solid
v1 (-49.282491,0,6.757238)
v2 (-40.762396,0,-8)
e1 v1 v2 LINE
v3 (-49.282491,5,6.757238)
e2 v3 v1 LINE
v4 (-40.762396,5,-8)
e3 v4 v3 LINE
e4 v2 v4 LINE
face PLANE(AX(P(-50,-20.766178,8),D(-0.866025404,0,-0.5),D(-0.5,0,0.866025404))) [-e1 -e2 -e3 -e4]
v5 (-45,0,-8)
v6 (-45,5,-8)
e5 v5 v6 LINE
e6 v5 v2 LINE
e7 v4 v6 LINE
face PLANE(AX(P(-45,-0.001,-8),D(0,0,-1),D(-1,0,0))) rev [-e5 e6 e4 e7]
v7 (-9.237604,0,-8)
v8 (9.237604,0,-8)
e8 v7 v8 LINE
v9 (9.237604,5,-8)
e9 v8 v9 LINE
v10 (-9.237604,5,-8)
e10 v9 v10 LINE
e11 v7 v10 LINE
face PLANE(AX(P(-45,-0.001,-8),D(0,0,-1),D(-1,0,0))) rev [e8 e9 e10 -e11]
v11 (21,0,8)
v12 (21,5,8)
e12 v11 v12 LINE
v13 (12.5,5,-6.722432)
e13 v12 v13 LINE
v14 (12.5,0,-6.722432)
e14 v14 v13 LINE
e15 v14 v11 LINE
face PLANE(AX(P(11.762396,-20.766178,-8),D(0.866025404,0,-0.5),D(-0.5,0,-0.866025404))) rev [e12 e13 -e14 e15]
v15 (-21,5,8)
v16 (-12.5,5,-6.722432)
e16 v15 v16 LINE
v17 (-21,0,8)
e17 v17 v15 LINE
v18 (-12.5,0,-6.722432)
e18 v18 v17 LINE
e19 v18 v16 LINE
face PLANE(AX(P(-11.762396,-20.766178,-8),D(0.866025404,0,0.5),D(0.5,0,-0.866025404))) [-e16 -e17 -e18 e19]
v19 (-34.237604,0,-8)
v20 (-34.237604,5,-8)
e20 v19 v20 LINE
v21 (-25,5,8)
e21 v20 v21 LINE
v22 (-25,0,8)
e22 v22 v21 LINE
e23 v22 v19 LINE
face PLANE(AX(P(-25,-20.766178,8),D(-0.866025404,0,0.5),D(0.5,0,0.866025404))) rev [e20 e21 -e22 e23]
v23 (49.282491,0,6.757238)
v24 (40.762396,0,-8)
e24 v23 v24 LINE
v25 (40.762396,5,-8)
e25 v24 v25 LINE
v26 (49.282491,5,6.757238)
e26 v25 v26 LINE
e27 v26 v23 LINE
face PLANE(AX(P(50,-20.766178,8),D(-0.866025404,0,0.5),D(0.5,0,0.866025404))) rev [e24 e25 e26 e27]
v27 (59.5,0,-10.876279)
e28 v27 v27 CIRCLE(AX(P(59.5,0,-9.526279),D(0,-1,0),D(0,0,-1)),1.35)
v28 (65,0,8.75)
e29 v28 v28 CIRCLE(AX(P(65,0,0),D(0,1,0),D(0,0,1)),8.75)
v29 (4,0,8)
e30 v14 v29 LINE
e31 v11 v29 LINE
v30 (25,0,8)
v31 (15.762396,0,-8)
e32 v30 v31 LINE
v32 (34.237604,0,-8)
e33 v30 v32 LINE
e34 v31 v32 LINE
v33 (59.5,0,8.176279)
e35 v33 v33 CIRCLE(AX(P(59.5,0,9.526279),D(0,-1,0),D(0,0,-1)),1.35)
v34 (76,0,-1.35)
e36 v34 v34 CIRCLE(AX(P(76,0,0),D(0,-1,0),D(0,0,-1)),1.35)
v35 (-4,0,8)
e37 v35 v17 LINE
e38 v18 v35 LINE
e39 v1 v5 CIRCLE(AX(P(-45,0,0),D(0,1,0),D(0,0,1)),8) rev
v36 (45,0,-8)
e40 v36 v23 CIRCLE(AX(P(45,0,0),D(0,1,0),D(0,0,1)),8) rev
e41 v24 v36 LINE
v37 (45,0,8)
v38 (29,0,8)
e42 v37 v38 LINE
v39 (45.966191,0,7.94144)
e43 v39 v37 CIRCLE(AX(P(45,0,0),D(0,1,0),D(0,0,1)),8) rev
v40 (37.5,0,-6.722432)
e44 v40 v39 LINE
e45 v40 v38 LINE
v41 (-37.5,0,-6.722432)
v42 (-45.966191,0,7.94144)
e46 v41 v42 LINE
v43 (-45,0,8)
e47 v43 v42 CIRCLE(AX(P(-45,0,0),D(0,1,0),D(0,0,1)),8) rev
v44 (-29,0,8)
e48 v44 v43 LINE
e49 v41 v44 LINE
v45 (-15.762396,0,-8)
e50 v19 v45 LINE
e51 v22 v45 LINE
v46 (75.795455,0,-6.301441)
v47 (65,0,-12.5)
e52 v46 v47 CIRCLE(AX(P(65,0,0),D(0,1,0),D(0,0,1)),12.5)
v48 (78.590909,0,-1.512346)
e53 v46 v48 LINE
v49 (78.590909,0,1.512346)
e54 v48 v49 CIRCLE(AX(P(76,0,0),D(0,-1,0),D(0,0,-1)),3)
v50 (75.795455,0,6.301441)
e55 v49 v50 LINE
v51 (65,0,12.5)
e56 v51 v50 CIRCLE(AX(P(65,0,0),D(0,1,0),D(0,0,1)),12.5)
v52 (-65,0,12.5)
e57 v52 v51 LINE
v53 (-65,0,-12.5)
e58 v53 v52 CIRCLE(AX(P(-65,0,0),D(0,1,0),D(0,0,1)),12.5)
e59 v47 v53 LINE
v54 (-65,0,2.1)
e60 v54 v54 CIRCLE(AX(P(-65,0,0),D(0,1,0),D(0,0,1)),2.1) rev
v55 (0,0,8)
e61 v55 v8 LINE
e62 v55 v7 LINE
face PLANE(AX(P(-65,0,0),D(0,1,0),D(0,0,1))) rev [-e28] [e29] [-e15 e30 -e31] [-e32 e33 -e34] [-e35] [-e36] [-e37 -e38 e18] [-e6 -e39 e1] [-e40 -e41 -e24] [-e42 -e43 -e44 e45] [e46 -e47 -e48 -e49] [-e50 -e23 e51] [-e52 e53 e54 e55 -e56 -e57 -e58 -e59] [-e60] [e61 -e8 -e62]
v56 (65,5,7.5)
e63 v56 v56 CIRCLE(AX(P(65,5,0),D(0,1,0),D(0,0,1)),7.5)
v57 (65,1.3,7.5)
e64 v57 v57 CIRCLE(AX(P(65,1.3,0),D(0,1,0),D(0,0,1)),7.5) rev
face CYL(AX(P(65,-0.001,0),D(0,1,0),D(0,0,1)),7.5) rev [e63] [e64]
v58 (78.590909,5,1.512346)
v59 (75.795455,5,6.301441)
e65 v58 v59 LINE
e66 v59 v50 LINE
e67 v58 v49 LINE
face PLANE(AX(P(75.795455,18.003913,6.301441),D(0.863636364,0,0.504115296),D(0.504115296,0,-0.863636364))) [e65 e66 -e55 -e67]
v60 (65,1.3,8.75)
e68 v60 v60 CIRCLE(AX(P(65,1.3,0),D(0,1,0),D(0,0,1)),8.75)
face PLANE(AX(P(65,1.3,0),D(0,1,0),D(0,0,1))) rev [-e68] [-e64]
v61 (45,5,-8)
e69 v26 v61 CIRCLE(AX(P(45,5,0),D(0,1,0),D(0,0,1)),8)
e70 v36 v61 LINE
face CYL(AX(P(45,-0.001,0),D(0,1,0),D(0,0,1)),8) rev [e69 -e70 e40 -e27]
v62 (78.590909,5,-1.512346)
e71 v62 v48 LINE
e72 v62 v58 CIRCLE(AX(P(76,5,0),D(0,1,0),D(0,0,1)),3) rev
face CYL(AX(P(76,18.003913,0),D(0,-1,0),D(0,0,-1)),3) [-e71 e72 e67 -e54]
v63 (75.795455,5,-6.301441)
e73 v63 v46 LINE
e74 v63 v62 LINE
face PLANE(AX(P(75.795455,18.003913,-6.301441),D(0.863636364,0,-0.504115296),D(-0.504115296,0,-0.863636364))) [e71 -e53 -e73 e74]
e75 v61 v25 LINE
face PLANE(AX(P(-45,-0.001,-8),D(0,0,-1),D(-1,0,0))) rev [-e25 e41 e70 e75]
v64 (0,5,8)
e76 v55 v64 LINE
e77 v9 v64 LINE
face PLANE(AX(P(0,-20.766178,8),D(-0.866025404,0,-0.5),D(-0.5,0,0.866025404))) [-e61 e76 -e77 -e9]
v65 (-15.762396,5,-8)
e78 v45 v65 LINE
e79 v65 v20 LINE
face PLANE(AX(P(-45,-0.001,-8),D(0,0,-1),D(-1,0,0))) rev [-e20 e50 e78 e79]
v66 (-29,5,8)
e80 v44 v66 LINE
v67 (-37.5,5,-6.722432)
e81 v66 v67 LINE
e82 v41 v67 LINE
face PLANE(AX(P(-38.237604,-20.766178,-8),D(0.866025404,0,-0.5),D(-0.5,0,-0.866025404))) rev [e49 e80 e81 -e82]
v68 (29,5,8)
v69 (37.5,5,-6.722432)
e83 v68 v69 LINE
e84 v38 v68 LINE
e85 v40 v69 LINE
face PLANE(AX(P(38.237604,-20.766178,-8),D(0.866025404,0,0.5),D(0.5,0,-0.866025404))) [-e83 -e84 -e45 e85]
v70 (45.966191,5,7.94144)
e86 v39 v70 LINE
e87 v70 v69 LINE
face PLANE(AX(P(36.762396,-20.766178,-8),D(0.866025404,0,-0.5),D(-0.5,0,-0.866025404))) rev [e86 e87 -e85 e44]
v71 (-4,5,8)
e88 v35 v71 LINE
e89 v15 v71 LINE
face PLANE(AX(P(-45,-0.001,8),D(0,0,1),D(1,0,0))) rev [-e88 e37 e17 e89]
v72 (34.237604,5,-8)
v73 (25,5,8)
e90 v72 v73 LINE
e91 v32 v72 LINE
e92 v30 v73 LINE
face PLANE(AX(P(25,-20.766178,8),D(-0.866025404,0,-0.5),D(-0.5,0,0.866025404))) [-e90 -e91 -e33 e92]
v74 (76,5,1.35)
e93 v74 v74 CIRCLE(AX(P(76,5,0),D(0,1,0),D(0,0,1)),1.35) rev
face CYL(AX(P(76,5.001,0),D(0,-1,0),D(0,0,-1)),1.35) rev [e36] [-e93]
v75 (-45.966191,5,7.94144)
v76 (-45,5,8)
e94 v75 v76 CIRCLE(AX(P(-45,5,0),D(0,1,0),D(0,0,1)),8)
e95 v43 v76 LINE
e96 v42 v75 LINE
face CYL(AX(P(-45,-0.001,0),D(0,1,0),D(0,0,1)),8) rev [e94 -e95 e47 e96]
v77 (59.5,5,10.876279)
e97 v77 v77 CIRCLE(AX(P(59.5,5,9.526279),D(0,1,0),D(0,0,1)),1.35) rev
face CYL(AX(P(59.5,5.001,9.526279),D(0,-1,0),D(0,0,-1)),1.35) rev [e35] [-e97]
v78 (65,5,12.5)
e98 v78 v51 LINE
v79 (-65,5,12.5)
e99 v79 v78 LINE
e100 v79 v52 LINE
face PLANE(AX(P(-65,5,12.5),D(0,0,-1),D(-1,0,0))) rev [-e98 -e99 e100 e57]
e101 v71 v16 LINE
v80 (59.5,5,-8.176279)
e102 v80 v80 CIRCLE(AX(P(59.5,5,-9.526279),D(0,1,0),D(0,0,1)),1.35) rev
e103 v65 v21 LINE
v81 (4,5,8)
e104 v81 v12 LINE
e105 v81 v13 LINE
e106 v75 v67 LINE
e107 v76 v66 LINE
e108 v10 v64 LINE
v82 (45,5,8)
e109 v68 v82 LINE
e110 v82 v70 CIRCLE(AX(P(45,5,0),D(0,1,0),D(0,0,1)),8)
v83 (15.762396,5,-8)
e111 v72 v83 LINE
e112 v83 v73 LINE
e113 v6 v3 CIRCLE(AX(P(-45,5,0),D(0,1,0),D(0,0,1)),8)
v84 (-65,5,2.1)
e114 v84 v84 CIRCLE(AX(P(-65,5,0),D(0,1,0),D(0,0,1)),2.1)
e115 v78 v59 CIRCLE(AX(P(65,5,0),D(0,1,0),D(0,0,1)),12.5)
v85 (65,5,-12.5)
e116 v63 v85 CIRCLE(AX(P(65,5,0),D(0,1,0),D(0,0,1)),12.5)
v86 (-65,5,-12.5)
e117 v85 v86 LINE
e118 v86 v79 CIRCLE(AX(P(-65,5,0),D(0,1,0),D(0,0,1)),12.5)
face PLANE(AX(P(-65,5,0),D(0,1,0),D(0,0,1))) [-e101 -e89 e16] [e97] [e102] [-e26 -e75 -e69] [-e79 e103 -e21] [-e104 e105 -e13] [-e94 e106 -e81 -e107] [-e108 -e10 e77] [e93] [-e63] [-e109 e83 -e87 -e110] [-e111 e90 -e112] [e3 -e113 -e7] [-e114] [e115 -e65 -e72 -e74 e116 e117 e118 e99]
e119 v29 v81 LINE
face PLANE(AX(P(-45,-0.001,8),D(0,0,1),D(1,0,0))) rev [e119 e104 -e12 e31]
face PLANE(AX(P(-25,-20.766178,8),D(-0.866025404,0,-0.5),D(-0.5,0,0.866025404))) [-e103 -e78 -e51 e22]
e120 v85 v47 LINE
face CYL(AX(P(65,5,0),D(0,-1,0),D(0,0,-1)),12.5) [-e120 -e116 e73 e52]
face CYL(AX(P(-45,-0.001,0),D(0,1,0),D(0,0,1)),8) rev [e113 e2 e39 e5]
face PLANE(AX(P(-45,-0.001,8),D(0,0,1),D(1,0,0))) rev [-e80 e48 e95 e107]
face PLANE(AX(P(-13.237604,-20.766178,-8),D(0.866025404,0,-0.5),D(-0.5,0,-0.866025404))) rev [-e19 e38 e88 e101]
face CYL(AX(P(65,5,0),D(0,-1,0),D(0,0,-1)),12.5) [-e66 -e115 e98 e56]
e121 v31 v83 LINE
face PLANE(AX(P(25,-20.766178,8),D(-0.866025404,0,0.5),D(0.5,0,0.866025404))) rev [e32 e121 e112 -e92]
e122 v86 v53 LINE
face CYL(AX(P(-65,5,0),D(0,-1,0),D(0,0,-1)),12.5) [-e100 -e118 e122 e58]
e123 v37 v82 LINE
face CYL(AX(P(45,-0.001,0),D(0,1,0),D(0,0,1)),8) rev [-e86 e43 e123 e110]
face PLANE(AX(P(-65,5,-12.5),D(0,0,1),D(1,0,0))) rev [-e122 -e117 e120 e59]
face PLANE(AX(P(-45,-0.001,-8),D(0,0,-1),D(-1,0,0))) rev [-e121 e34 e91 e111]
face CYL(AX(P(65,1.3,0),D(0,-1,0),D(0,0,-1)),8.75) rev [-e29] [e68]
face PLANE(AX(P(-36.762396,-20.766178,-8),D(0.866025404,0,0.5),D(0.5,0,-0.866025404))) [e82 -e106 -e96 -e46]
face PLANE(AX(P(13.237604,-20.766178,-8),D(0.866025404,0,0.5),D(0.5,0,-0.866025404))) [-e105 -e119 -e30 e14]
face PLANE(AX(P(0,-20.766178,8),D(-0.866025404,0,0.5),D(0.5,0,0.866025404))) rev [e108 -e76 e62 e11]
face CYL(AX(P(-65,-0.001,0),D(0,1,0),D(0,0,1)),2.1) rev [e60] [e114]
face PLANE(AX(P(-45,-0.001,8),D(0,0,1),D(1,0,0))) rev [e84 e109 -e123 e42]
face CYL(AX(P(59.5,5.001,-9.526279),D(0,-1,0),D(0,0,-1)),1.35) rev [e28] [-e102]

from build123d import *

# Parameters (mm, degrees)
EXTRUDE_1_DEPTH        = 5
EXTRUDE_5_DEPTH        = 5
CUT_EXTRUDE_2_REACH    = 82.139
SKETCH_7_R             = 7.5
SKETCH_8_R             = 8.75
CUT_EXTRUDE_3_DEPTH    = 1.3
CUT_EXTRUDE_4_REACH    = 82.139
SKETCH_9_R             = 1.35
CUT_EXTRUDE_5_REACH    = 82.139
SKETCH_12_R            = 2.1
CUT_EXTRUDE_6_REACH    = 82.139
EXTRUDE_6_DEPTH        = 5
PATTERN_LINEAR_1_DEPTH = 5


# Read off the part's stored shape, not the designer's step: 阵列(线性)1
with BuildPart() as part:
    # 草图1 → 凸台-拉伸1 (new body)
    with BuildSketch(Plane(origin=(0, 0, 0), x_dir=(1, 0, 0), z_dir=(0, 1, 0))):
        with BuildLine():
            Line((-65, 12.5), (65, 12.5))
            ThreePointArc((65, 12.5), (77.5, 0), (65, -12.5))
            Line((65, -12.5), (-65, -12.5))
            ThreePointArc((-65, -12.5), (-77.5, 0), (-65, 12.5))
        make_face()
    extrude(amount=EXTRUDE_1_DEPTH)

    # 草图10 → 凸台-拉伸5 (add)
    with BuildSketch(Plane.XZ):
        with BuildLine():
            Line((75.795454545, -6.301441197), (78.590909091, -1.512345887))
            ThreePointArc((78.590909091, -1.512345887), (79, 0), (78.590909091, 1.512345887))
            Line((78.590909091, 1.512345887), (75.795454545, 6.301441197))
            Line((75.795454545, 6.301441197), (75.795454545, -6.301441197))
        make_face()
    extrude(amount=-EXTRUDE_5_DEPTH)

    # 草图7 → 切除-拉伸2 (cut, up to next)
    with BuildSketch(Plane(origin=(0, 5, 0), x_dir=(1, 0, 0), z_dir=(0, 1, 0)), mode=Mode.PRIVATE) as cut_extrude_2_sk1:
        with Locations(Location((65, 0, 0), (0, 0, 270))):
            Circle(SKETCH_7_R)
    cut_extrude_2_tool1 = extrude(cut_extrude_2_sk1.sketch, amount=-CUT_EXTRUDE_2_REACH, mode=Mode.PRIVATE) & part.part
    add(cut_extrude_2_tool1.solids().sort_by_distance((65, 5, 0))[0], mode=Mode.SUBTRACT)

    # 草图8 → 切除-拉伸3 (cut)
    with BuildSketch(Plane(origin=(0, 0, 0), x_dir=(1, 0, 0), z_dir=(0, 1, 0))):
        with Locations(Location((65, 0, 0), (0, 0, 270))):
            Circle(SKETCH_8_R)
    extrude(amount=CUT_EXTRUDE_3_DEPTH, mode=Mode.SUBTRACT)

    # 草图9 → 切除-拉伸4 (cut, up to next)
    with BuildSketch(Plane.XZ, mode=Mode.PRIVATE) as cut_extrude_4_sk1:
        with Locations(Location((59.5, 9.526279442, 0), (0, 0, 270))):
            Circle(SKETCH_9_R)
    cut_extrude_4_tool1 = extrude(cut_extrude_4_sk1.sketch, amount=-CUT_EXTRUDE_4_REACH, mode=Mode.PRIVATE) & part.part
    # 草图9 → 切除-拉伸4 (cut, up to next)
    with BuildSketch(Plane.XZ, mode=Mode.PRIVATE) as cut_extrude_4_sk2:
        with Locations(Location((76, 0, 0), (0, 0, 270))):
            Circle(SKETCH_9_R)
    cut_extrude_4_tool2 = extrude(cut_extrude_4_sk2.sketch, amount=-CUT_EXTRUDE_4_REACH, mode=Mode.PRIVATE) & part.part
    # 草图9 → 切除-拉伸4 (cut, up to next)
    with BuildSketch(Plane.XZ, mode=Mode.PRIVATE) as cut_extrude_4_sk3:
        with Locations(Location((59.5, -9.526279442, 0), (0, 0, 270))):
            Circle(SKETCH_9_R)
    cut_extrude_4_tool3 = extrude(cut_extrude_4_sk3.sketch, amount=-CUT_EXTRUDE_4_REACH, mode=Mode.PRIVATE) & part.part
    add(cut_extrude_4_tool1.solids().sort_by_distance((59.5, 0, 9.526279))[0], mode=Mode.SUBTRACT)
    add(cut_extrude_4_tool2.solids().sort_by_distance((76, 0, 0))[0], mode=Mode.SUBTRACT)
    add(cut_extrude_4_tool3.solids().sort_by_distance((59.5, 0, -9.526279))[0], mode=Mode.SUBTRACT)

    # 草图12 → 切除-拉伸5 (cut, up to next)
    with BuildSketch(Plane(origin=(0, 5, 0), x_dir=(1, 0, 0), z_dir=(0, 1, 0)), mode=Mode.PRIVATE) as cut_extrude_5_sk1:
        with Locations(Location((-65, 0, 0), (0, 0, 270))):
            Circle(SKETCH_12_R)
    cut_extrude_5_tool1 = extrude(cut_extrude_5_sk1.sketch, amount=-CUT_EXTRUDE_5_REACH, mode=Mode.PRIVATE) & part.part
    add(cut_extrude_5_tool1.solids().sort_by_distance((-65, 5, 0))[0], mode=Mode.SUBTRACT)

    # 草图13 → 切除-拉伸6 (cut, up to next)
    with BuildSketch(Plane(origin=(0, 5, 0), x_dir=(1, 0, 0), z_dir=(0, 1, 0)), mode=Mode.PRIVATE) as cut_extrude_6_sk1:
        with BuildLine():
            Line((-45, 8), (45, 8))
            ThreePointArc((45, 8), (53, 0), (45, -8))
            Line((45, -8), (-45, -8))
            ThreePointArc((-45, -8), (-53, 0), (-45, 8))
        make_face()
    cut_extrude_6_tool1 = extrude(cut_extrude_6_sk1.sketch, amount=-CUT_EXTRUDE_6_REACH, mode=Mode.PRIVATE) & part.part
    add(cut_extrude_6_tool1.solids().sort_by_distance((0, 5, 0))[0], mode=Mode.SUBTRACT)

    # 草图14 → 凸台-拉伸6 (add)
    with BuildSketch(Plane(origin=(0, 5, 0), x_dir=(1, 0, 0), z_dir=(0, 1, 0))):
        Polygon((0, -8), (9.237604307, 8), (13.237604307, 8), (4, -8), align=None)
    extrude_6 = extrude(amount=-EXTRUDE_6_DEPTH)

    # 阵列(线性)1 outline → 阵列(线性)1 (add)
    with BuildSketch(Plane(origin=(0, 0, 0), x_dir=(1, 0, 0), z_dir=(0, 1, 0))):
        Polygon((38.237604307, 8), (34.237604307, 8), (25, -8), (29, -8), align=None)
        Polygon((-11.762395693, 8), (-15.762395693, 8), (-25, -8), (-21, -8), align=None)
        with BuildLine():
            Line((-45.966190603, -7.941440406), (-36.762395693, 8))
            Line((-36.762395693, 8), (-40.762395693, 8))
            Line((-40.762395693, 8), (-49.282491188, -6.757238284))
            ThreePointArc((-49.282491188, -6.757238284), (-47.690306451, -7.534072683), (-45.966190603, -7.941440406))
        make_face()
    pattern_linear_1 = extrude(amount=PATTERN_LINEAR_1_DEPTH)

    # 镜向1: 凸台-拉伸6, 阵列(线性)1 across plane
    add(extrude_6.mirror(Plane(origin=(0, 0, 0), x_dir=(0, 0, 1), z_dir=(1, 0, 0))))
    add(pattern_linear_1.mirror(Plane(origin=(0, 0, 0), x_dir=(0, 0, 1), z_dir=(1, 0, 0))))


solid = part.part
